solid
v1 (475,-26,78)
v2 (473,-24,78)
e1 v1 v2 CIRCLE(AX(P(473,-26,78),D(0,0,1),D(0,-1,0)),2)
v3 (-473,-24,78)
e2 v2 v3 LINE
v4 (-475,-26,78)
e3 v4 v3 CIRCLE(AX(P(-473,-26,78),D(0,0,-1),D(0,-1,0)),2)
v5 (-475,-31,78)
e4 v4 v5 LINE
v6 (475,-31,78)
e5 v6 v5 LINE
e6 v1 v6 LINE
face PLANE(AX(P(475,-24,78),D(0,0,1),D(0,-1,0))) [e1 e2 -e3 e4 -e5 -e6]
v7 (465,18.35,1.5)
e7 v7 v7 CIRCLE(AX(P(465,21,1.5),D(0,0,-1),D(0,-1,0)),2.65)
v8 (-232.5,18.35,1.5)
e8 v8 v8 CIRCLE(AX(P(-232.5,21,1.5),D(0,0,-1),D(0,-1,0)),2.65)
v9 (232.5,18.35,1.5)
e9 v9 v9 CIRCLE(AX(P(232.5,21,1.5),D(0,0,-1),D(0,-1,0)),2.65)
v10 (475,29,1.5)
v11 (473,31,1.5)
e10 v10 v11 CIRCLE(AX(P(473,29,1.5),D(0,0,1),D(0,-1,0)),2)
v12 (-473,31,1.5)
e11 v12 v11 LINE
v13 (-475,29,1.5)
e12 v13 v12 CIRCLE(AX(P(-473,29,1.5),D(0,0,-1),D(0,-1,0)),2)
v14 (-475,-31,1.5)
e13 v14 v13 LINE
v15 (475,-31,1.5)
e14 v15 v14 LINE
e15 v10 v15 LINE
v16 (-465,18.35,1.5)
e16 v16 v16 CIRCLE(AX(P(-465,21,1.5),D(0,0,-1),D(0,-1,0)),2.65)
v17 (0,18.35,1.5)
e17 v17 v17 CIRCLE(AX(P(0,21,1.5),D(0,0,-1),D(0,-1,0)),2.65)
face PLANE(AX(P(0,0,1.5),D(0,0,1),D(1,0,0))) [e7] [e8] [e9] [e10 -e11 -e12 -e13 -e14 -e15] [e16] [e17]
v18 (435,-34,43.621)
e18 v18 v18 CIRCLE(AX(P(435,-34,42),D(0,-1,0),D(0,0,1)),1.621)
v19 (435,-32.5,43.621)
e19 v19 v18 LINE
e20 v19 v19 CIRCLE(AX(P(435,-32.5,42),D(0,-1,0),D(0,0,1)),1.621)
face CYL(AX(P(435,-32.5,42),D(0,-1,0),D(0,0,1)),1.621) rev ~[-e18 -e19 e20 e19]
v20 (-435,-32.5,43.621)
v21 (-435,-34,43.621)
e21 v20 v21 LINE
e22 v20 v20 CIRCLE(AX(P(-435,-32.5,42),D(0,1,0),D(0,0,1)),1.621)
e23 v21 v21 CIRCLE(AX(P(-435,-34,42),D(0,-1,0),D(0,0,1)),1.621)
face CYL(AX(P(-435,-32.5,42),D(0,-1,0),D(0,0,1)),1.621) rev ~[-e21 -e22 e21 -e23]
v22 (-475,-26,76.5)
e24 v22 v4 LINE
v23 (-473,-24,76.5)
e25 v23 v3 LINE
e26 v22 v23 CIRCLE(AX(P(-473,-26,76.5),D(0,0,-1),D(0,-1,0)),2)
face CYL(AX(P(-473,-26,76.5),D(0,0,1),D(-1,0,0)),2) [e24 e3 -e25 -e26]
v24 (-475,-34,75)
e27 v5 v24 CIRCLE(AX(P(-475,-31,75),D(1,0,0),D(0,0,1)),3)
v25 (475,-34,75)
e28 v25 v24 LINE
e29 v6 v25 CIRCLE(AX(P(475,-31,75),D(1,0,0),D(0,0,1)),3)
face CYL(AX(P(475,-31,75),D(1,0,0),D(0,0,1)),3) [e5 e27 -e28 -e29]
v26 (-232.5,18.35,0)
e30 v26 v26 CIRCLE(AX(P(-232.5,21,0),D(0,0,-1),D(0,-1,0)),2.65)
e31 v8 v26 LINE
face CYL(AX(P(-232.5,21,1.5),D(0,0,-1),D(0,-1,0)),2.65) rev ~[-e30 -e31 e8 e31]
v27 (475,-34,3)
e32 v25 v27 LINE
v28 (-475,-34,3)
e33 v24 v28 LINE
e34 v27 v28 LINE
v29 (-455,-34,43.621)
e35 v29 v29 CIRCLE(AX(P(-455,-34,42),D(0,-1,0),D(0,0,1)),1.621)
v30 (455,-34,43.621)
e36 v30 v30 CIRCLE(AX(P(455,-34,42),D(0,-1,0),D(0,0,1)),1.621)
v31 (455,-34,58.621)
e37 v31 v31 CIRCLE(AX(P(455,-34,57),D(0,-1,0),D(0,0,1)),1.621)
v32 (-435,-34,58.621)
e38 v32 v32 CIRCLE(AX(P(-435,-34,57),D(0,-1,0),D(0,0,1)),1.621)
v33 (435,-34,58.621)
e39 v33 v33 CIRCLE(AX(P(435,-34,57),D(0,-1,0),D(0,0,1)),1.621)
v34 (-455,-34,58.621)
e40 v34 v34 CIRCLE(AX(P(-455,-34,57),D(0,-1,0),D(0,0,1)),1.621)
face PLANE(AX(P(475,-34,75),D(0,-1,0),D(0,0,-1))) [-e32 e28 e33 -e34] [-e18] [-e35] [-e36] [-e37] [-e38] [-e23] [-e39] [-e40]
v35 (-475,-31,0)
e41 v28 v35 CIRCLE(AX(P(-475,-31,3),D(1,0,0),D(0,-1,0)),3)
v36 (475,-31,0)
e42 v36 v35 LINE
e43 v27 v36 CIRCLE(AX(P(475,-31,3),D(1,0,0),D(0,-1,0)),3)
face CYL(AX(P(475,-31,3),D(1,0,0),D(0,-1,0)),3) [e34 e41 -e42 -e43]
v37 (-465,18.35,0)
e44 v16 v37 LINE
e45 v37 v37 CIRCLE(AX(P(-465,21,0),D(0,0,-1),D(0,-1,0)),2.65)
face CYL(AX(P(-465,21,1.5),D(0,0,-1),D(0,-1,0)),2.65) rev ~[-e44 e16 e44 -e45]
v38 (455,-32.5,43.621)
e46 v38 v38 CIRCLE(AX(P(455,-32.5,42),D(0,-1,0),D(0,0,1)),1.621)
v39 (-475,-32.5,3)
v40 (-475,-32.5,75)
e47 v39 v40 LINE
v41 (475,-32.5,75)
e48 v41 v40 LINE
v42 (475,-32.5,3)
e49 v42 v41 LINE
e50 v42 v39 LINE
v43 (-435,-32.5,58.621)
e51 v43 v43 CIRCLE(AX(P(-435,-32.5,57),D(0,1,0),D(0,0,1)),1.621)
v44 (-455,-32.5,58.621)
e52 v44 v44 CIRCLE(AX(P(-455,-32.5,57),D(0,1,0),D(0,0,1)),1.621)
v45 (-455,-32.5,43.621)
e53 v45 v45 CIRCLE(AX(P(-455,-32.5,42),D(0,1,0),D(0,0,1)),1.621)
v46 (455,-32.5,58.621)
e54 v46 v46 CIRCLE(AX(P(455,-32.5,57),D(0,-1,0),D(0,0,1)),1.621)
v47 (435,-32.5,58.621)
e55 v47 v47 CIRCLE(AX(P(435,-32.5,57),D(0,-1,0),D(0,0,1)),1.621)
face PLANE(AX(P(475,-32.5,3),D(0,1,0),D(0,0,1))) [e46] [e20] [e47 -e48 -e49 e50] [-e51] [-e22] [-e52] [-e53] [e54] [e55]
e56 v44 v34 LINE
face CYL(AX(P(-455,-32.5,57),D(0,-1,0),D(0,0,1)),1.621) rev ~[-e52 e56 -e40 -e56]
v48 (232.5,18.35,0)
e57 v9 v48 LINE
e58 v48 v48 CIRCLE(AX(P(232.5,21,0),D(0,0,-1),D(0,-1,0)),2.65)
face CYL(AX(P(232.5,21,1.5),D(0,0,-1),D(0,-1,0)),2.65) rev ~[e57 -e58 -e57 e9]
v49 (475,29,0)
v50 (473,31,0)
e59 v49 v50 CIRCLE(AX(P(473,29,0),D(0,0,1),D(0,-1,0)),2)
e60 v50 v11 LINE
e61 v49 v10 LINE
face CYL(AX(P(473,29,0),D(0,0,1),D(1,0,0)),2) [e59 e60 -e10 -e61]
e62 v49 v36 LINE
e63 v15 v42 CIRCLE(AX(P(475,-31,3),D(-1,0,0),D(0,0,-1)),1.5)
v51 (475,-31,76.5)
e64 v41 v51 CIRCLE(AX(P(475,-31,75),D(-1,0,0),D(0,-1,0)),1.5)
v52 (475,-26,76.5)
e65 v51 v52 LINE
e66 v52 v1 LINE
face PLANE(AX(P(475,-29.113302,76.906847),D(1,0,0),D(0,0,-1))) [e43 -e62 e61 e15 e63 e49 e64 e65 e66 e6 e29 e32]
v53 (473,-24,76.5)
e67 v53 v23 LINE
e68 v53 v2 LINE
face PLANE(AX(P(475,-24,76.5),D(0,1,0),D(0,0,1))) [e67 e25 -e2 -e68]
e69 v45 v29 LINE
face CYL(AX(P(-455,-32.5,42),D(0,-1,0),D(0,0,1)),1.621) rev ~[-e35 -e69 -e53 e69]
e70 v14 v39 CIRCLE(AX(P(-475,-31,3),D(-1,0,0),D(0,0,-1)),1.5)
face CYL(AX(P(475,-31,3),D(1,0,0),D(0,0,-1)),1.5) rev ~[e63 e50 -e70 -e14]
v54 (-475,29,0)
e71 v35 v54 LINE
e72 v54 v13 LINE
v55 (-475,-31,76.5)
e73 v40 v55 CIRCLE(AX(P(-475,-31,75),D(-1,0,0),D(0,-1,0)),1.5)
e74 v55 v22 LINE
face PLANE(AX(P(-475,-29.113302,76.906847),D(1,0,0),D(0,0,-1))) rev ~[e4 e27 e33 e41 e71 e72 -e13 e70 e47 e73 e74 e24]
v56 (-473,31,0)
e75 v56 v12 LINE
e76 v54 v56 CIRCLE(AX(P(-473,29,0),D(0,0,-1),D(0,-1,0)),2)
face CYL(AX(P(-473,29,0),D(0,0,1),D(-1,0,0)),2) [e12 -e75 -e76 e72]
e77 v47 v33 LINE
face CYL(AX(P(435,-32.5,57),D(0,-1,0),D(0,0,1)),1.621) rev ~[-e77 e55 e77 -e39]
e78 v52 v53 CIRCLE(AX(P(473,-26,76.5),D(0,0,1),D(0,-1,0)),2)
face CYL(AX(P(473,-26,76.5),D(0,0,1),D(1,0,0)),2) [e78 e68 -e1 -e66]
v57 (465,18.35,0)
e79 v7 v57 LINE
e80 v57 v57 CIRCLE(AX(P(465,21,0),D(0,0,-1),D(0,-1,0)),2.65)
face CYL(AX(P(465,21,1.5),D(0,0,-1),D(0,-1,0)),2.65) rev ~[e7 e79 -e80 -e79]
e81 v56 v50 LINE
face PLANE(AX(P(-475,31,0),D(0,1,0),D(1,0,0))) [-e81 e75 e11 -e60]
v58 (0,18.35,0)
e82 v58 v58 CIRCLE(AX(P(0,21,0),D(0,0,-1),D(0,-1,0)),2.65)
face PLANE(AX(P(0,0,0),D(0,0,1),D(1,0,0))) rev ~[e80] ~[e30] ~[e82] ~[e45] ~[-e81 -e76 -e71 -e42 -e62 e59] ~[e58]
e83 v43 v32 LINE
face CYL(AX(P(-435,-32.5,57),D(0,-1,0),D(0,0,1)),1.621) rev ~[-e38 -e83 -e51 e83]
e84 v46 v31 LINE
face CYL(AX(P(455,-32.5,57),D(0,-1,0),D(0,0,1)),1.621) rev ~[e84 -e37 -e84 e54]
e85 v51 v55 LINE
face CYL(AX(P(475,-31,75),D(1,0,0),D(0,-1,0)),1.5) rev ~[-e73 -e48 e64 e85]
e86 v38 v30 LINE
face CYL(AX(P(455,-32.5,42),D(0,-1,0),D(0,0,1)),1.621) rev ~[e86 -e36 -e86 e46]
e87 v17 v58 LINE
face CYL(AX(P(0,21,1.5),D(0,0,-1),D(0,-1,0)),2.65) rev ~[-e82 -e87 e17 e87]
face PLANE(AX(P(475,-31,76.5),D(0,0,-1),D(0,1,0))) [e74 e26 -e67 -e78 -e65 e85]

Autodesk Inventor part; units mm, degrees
ref_plane "YZ Plane" through (0, 0, 0) normal (1, 0, 0) x (0, 1, 0)
ref_plane "XZ Plane" through (0, 0, 0) normal (0, 1, 0) x (-1, 0, 0)
ref_plane "XY Plane" through (0, 0, 0) normal (0, 0, 1) x (1, 0, 0)
sketch "スケッチ1" plane through (0, 0, 0) normal (0, 0, 1) x (1, 0, 0)
  line L0 (475, -31) -> (-475, -31)
  line L1 (-475, -31) -> (-475, 31)
  line L2 (-475, 31) -> (475, 31)
  line L3 (475, 31) -> (475, -31)
  line L4 (475, -31) -> (-475, 31) construction
  line L5 (-475, -31) -> (475, 31) construction
  point P0 (0, 0)
  dimension "d0" = 62
  dimension "d1" = 950
extrude "プレート1" add sketch "スケッチ1" along normal blind 1.5
sketch "スケッチ2" plane through (475, -32.5, 3) normal (0, -1, 0) x (1, 0, 0)
  line L0 (-950, 0) -> (0, 0)
  line L1 (0, 0) -> (0, 72)
  line L2 (0, 72) -> (-950, 72)
  line L3 (-950, 72) -> (-950, 0)
edge flange "フランジ1" height 75 angle 90 thickness 1.5 bend radius 1.5 thickness toward (0, -1, 0) relief tear relief width 1.5 relief depth 0.75 edges at (0, -31, 1.5) wall of the first edge with corners at (-475, -32.5, 3) (475, -32.5, 3) (475, -32.5, 75) (-475, -32.5, 75)
bend "曲げ1"
corner "コーナー1"
sketch "スケッチ3" plane through (475, -31, 76.5) normal (0, 0, 1) x (1, 0, 0)
  line L0 (-950, 0) -> (0, 0)
  line L1 (0, 0) -> (0, 7)
  line L2 (0, 7) -> (-950, 7)
  line L3 (-950, 7) -> (-950, 0)
edge flange "フランジ2" height 10 angle 90 thickness 1.5 bend radius 1.5 thickness toward (0, 0, 1) relief tear relief width 1.5 relief depth 0.75 edges at (0, -32.5, 75) wall of the first edge with corners at (-475, -31, 76.5) (475, -31, 76.5) (475, -24, 76.5) (-475, -24, 76.5)
bend "曲げ2"
corner "コーナー2"
sketch "スケッチ4" plane through (0, 0, 1.5) normal (0, 0, 1) x (1, 0, 0)
  line L0 (-475, -31) -> (-475, 31) projected
  line L1 (475, -31) -> (-475, -31) projected
  line L2 (475, 31) -> (475, -31) projected
  line L3 (-475, 31) -> (475, 31) projected
  line L4 (-465, 21) -> (465, 21)
  point P0 (0, 0)
  point P1 (-232.5, 21)
  point P2 (0, 21)
  point P3 (232.5, 21)
  dimension "d23" = 10
  dimension "d24" = 10
  dimension "d25" = 10
  dimension "d26" = 930
  dimension "d27" = 232.5
  dimension "d28" = 232.5
  dimension "d29" = 232.5
hole "穴1" at (-465, 21, 1.5) at (-232.5, 21, 1.5) at (0, 21, 1.5) at (232.5, 21, 1.5) at (465, 21, 1.5) direction (0, 0, -1) diameter 5.3 end through all
sketch "スケッチ5" plane through (-475, -32.5, 3) normal (0, 1, 0) x (1, 0, 0)
  line L0 (950, 0) -> (0, 0) projected
  line L1 (0, -72) -> (0, 0) projected
  line L2 (0, -72) -> (950, -72) projected
  line L3 (950, -72) -> (950, 0) projected
  line L4 (930, -54) -> (930, -39)
  line L5 (0, 1.5) -> (950, 1.5) projected
  line L6 (930, -54) -> (910, -54)
  line L7 (910, -54) -> (910, -39)
  line L8 (910, -39) -> (930, -39)
  line L9 (930, -39) -> (930, -54)
  point P0 (475, 3)
  point P1 (930, -46.5)
  dimension "d37" = 15
  dimension "d38" = 48
  dimension "d39" = 20
  dimension "d40" = 20
hole "穴2" at (455, -32.5, 57) at (455, -32.5, 42) at (435, -32.5, 57) at (435, -32.5, 42) direction (0, -1, 0) diameter 3.242 end through all thread size "M4x0.7" class "6H" standard "ISO Metric profile"
mirror "ミラー1" about plane through (0, 0, 0) normal (1, 0, 0) of "穴2"
fillet "フィレット1" radius 2 4 edges at (-475, 31, 0.75) (-475, -24, 77.25) (475, 31, 0.75) (475, -24, 77.25)
equation "\"d27\" = 0.25 * d26"
equation "\"d28\" = d27"
equation "\"d29\" = d27"
equation "\"d35\" = Thickness"
equation "\"d2\" = Thickness"
equation "\"d3\" = BendReliefWidth"
equation "\"d4\" = BendReliefDepth"
equation "\"d5\" = MinimumRemnant"
equation "\"d6\" = TransitionRadius"
equation "\"d9\" = BendRadius"
equation "\"d10\" = CornerReliefSize"
equation "\"d11\" = GapSize"
equation "\"d12\" = JacobiRadiusSize"
equation "\"d13\" = BendReliefWidth"
equation "\"d14\" = BendReliefDepth"
equation "\"d15\" = MinimumRemnant"
equation "\"d16\" = TransitionRadius"
equation "\"d19\" = BendRadius"
equation "\"d20\" = CornerReliefSize"
equation "\"d21\" = GapSize"
equation "\"d22\" = JacobiRadiusSize"
equation "\"BendRadius\" = Thickness"
equation "\"BendReliefWidth\" = Thickness"
equation "\"BendReliefDepth\" = 0.5 * Thickness"
equation "\"CornerReliefSize\" = 4 * Thickness"
equation "\"MinimumRemnant\" = 2 * Thickness"
equation "\"TransitionRadius\" = BendRadius"
equation "\"JacobiRadiusSize\" = BendRadius"
equation "\"GapSize\" = Thickness"
equation "\"Thickness\" = 1.5"
properties part number "DragChain_Guide_A"
